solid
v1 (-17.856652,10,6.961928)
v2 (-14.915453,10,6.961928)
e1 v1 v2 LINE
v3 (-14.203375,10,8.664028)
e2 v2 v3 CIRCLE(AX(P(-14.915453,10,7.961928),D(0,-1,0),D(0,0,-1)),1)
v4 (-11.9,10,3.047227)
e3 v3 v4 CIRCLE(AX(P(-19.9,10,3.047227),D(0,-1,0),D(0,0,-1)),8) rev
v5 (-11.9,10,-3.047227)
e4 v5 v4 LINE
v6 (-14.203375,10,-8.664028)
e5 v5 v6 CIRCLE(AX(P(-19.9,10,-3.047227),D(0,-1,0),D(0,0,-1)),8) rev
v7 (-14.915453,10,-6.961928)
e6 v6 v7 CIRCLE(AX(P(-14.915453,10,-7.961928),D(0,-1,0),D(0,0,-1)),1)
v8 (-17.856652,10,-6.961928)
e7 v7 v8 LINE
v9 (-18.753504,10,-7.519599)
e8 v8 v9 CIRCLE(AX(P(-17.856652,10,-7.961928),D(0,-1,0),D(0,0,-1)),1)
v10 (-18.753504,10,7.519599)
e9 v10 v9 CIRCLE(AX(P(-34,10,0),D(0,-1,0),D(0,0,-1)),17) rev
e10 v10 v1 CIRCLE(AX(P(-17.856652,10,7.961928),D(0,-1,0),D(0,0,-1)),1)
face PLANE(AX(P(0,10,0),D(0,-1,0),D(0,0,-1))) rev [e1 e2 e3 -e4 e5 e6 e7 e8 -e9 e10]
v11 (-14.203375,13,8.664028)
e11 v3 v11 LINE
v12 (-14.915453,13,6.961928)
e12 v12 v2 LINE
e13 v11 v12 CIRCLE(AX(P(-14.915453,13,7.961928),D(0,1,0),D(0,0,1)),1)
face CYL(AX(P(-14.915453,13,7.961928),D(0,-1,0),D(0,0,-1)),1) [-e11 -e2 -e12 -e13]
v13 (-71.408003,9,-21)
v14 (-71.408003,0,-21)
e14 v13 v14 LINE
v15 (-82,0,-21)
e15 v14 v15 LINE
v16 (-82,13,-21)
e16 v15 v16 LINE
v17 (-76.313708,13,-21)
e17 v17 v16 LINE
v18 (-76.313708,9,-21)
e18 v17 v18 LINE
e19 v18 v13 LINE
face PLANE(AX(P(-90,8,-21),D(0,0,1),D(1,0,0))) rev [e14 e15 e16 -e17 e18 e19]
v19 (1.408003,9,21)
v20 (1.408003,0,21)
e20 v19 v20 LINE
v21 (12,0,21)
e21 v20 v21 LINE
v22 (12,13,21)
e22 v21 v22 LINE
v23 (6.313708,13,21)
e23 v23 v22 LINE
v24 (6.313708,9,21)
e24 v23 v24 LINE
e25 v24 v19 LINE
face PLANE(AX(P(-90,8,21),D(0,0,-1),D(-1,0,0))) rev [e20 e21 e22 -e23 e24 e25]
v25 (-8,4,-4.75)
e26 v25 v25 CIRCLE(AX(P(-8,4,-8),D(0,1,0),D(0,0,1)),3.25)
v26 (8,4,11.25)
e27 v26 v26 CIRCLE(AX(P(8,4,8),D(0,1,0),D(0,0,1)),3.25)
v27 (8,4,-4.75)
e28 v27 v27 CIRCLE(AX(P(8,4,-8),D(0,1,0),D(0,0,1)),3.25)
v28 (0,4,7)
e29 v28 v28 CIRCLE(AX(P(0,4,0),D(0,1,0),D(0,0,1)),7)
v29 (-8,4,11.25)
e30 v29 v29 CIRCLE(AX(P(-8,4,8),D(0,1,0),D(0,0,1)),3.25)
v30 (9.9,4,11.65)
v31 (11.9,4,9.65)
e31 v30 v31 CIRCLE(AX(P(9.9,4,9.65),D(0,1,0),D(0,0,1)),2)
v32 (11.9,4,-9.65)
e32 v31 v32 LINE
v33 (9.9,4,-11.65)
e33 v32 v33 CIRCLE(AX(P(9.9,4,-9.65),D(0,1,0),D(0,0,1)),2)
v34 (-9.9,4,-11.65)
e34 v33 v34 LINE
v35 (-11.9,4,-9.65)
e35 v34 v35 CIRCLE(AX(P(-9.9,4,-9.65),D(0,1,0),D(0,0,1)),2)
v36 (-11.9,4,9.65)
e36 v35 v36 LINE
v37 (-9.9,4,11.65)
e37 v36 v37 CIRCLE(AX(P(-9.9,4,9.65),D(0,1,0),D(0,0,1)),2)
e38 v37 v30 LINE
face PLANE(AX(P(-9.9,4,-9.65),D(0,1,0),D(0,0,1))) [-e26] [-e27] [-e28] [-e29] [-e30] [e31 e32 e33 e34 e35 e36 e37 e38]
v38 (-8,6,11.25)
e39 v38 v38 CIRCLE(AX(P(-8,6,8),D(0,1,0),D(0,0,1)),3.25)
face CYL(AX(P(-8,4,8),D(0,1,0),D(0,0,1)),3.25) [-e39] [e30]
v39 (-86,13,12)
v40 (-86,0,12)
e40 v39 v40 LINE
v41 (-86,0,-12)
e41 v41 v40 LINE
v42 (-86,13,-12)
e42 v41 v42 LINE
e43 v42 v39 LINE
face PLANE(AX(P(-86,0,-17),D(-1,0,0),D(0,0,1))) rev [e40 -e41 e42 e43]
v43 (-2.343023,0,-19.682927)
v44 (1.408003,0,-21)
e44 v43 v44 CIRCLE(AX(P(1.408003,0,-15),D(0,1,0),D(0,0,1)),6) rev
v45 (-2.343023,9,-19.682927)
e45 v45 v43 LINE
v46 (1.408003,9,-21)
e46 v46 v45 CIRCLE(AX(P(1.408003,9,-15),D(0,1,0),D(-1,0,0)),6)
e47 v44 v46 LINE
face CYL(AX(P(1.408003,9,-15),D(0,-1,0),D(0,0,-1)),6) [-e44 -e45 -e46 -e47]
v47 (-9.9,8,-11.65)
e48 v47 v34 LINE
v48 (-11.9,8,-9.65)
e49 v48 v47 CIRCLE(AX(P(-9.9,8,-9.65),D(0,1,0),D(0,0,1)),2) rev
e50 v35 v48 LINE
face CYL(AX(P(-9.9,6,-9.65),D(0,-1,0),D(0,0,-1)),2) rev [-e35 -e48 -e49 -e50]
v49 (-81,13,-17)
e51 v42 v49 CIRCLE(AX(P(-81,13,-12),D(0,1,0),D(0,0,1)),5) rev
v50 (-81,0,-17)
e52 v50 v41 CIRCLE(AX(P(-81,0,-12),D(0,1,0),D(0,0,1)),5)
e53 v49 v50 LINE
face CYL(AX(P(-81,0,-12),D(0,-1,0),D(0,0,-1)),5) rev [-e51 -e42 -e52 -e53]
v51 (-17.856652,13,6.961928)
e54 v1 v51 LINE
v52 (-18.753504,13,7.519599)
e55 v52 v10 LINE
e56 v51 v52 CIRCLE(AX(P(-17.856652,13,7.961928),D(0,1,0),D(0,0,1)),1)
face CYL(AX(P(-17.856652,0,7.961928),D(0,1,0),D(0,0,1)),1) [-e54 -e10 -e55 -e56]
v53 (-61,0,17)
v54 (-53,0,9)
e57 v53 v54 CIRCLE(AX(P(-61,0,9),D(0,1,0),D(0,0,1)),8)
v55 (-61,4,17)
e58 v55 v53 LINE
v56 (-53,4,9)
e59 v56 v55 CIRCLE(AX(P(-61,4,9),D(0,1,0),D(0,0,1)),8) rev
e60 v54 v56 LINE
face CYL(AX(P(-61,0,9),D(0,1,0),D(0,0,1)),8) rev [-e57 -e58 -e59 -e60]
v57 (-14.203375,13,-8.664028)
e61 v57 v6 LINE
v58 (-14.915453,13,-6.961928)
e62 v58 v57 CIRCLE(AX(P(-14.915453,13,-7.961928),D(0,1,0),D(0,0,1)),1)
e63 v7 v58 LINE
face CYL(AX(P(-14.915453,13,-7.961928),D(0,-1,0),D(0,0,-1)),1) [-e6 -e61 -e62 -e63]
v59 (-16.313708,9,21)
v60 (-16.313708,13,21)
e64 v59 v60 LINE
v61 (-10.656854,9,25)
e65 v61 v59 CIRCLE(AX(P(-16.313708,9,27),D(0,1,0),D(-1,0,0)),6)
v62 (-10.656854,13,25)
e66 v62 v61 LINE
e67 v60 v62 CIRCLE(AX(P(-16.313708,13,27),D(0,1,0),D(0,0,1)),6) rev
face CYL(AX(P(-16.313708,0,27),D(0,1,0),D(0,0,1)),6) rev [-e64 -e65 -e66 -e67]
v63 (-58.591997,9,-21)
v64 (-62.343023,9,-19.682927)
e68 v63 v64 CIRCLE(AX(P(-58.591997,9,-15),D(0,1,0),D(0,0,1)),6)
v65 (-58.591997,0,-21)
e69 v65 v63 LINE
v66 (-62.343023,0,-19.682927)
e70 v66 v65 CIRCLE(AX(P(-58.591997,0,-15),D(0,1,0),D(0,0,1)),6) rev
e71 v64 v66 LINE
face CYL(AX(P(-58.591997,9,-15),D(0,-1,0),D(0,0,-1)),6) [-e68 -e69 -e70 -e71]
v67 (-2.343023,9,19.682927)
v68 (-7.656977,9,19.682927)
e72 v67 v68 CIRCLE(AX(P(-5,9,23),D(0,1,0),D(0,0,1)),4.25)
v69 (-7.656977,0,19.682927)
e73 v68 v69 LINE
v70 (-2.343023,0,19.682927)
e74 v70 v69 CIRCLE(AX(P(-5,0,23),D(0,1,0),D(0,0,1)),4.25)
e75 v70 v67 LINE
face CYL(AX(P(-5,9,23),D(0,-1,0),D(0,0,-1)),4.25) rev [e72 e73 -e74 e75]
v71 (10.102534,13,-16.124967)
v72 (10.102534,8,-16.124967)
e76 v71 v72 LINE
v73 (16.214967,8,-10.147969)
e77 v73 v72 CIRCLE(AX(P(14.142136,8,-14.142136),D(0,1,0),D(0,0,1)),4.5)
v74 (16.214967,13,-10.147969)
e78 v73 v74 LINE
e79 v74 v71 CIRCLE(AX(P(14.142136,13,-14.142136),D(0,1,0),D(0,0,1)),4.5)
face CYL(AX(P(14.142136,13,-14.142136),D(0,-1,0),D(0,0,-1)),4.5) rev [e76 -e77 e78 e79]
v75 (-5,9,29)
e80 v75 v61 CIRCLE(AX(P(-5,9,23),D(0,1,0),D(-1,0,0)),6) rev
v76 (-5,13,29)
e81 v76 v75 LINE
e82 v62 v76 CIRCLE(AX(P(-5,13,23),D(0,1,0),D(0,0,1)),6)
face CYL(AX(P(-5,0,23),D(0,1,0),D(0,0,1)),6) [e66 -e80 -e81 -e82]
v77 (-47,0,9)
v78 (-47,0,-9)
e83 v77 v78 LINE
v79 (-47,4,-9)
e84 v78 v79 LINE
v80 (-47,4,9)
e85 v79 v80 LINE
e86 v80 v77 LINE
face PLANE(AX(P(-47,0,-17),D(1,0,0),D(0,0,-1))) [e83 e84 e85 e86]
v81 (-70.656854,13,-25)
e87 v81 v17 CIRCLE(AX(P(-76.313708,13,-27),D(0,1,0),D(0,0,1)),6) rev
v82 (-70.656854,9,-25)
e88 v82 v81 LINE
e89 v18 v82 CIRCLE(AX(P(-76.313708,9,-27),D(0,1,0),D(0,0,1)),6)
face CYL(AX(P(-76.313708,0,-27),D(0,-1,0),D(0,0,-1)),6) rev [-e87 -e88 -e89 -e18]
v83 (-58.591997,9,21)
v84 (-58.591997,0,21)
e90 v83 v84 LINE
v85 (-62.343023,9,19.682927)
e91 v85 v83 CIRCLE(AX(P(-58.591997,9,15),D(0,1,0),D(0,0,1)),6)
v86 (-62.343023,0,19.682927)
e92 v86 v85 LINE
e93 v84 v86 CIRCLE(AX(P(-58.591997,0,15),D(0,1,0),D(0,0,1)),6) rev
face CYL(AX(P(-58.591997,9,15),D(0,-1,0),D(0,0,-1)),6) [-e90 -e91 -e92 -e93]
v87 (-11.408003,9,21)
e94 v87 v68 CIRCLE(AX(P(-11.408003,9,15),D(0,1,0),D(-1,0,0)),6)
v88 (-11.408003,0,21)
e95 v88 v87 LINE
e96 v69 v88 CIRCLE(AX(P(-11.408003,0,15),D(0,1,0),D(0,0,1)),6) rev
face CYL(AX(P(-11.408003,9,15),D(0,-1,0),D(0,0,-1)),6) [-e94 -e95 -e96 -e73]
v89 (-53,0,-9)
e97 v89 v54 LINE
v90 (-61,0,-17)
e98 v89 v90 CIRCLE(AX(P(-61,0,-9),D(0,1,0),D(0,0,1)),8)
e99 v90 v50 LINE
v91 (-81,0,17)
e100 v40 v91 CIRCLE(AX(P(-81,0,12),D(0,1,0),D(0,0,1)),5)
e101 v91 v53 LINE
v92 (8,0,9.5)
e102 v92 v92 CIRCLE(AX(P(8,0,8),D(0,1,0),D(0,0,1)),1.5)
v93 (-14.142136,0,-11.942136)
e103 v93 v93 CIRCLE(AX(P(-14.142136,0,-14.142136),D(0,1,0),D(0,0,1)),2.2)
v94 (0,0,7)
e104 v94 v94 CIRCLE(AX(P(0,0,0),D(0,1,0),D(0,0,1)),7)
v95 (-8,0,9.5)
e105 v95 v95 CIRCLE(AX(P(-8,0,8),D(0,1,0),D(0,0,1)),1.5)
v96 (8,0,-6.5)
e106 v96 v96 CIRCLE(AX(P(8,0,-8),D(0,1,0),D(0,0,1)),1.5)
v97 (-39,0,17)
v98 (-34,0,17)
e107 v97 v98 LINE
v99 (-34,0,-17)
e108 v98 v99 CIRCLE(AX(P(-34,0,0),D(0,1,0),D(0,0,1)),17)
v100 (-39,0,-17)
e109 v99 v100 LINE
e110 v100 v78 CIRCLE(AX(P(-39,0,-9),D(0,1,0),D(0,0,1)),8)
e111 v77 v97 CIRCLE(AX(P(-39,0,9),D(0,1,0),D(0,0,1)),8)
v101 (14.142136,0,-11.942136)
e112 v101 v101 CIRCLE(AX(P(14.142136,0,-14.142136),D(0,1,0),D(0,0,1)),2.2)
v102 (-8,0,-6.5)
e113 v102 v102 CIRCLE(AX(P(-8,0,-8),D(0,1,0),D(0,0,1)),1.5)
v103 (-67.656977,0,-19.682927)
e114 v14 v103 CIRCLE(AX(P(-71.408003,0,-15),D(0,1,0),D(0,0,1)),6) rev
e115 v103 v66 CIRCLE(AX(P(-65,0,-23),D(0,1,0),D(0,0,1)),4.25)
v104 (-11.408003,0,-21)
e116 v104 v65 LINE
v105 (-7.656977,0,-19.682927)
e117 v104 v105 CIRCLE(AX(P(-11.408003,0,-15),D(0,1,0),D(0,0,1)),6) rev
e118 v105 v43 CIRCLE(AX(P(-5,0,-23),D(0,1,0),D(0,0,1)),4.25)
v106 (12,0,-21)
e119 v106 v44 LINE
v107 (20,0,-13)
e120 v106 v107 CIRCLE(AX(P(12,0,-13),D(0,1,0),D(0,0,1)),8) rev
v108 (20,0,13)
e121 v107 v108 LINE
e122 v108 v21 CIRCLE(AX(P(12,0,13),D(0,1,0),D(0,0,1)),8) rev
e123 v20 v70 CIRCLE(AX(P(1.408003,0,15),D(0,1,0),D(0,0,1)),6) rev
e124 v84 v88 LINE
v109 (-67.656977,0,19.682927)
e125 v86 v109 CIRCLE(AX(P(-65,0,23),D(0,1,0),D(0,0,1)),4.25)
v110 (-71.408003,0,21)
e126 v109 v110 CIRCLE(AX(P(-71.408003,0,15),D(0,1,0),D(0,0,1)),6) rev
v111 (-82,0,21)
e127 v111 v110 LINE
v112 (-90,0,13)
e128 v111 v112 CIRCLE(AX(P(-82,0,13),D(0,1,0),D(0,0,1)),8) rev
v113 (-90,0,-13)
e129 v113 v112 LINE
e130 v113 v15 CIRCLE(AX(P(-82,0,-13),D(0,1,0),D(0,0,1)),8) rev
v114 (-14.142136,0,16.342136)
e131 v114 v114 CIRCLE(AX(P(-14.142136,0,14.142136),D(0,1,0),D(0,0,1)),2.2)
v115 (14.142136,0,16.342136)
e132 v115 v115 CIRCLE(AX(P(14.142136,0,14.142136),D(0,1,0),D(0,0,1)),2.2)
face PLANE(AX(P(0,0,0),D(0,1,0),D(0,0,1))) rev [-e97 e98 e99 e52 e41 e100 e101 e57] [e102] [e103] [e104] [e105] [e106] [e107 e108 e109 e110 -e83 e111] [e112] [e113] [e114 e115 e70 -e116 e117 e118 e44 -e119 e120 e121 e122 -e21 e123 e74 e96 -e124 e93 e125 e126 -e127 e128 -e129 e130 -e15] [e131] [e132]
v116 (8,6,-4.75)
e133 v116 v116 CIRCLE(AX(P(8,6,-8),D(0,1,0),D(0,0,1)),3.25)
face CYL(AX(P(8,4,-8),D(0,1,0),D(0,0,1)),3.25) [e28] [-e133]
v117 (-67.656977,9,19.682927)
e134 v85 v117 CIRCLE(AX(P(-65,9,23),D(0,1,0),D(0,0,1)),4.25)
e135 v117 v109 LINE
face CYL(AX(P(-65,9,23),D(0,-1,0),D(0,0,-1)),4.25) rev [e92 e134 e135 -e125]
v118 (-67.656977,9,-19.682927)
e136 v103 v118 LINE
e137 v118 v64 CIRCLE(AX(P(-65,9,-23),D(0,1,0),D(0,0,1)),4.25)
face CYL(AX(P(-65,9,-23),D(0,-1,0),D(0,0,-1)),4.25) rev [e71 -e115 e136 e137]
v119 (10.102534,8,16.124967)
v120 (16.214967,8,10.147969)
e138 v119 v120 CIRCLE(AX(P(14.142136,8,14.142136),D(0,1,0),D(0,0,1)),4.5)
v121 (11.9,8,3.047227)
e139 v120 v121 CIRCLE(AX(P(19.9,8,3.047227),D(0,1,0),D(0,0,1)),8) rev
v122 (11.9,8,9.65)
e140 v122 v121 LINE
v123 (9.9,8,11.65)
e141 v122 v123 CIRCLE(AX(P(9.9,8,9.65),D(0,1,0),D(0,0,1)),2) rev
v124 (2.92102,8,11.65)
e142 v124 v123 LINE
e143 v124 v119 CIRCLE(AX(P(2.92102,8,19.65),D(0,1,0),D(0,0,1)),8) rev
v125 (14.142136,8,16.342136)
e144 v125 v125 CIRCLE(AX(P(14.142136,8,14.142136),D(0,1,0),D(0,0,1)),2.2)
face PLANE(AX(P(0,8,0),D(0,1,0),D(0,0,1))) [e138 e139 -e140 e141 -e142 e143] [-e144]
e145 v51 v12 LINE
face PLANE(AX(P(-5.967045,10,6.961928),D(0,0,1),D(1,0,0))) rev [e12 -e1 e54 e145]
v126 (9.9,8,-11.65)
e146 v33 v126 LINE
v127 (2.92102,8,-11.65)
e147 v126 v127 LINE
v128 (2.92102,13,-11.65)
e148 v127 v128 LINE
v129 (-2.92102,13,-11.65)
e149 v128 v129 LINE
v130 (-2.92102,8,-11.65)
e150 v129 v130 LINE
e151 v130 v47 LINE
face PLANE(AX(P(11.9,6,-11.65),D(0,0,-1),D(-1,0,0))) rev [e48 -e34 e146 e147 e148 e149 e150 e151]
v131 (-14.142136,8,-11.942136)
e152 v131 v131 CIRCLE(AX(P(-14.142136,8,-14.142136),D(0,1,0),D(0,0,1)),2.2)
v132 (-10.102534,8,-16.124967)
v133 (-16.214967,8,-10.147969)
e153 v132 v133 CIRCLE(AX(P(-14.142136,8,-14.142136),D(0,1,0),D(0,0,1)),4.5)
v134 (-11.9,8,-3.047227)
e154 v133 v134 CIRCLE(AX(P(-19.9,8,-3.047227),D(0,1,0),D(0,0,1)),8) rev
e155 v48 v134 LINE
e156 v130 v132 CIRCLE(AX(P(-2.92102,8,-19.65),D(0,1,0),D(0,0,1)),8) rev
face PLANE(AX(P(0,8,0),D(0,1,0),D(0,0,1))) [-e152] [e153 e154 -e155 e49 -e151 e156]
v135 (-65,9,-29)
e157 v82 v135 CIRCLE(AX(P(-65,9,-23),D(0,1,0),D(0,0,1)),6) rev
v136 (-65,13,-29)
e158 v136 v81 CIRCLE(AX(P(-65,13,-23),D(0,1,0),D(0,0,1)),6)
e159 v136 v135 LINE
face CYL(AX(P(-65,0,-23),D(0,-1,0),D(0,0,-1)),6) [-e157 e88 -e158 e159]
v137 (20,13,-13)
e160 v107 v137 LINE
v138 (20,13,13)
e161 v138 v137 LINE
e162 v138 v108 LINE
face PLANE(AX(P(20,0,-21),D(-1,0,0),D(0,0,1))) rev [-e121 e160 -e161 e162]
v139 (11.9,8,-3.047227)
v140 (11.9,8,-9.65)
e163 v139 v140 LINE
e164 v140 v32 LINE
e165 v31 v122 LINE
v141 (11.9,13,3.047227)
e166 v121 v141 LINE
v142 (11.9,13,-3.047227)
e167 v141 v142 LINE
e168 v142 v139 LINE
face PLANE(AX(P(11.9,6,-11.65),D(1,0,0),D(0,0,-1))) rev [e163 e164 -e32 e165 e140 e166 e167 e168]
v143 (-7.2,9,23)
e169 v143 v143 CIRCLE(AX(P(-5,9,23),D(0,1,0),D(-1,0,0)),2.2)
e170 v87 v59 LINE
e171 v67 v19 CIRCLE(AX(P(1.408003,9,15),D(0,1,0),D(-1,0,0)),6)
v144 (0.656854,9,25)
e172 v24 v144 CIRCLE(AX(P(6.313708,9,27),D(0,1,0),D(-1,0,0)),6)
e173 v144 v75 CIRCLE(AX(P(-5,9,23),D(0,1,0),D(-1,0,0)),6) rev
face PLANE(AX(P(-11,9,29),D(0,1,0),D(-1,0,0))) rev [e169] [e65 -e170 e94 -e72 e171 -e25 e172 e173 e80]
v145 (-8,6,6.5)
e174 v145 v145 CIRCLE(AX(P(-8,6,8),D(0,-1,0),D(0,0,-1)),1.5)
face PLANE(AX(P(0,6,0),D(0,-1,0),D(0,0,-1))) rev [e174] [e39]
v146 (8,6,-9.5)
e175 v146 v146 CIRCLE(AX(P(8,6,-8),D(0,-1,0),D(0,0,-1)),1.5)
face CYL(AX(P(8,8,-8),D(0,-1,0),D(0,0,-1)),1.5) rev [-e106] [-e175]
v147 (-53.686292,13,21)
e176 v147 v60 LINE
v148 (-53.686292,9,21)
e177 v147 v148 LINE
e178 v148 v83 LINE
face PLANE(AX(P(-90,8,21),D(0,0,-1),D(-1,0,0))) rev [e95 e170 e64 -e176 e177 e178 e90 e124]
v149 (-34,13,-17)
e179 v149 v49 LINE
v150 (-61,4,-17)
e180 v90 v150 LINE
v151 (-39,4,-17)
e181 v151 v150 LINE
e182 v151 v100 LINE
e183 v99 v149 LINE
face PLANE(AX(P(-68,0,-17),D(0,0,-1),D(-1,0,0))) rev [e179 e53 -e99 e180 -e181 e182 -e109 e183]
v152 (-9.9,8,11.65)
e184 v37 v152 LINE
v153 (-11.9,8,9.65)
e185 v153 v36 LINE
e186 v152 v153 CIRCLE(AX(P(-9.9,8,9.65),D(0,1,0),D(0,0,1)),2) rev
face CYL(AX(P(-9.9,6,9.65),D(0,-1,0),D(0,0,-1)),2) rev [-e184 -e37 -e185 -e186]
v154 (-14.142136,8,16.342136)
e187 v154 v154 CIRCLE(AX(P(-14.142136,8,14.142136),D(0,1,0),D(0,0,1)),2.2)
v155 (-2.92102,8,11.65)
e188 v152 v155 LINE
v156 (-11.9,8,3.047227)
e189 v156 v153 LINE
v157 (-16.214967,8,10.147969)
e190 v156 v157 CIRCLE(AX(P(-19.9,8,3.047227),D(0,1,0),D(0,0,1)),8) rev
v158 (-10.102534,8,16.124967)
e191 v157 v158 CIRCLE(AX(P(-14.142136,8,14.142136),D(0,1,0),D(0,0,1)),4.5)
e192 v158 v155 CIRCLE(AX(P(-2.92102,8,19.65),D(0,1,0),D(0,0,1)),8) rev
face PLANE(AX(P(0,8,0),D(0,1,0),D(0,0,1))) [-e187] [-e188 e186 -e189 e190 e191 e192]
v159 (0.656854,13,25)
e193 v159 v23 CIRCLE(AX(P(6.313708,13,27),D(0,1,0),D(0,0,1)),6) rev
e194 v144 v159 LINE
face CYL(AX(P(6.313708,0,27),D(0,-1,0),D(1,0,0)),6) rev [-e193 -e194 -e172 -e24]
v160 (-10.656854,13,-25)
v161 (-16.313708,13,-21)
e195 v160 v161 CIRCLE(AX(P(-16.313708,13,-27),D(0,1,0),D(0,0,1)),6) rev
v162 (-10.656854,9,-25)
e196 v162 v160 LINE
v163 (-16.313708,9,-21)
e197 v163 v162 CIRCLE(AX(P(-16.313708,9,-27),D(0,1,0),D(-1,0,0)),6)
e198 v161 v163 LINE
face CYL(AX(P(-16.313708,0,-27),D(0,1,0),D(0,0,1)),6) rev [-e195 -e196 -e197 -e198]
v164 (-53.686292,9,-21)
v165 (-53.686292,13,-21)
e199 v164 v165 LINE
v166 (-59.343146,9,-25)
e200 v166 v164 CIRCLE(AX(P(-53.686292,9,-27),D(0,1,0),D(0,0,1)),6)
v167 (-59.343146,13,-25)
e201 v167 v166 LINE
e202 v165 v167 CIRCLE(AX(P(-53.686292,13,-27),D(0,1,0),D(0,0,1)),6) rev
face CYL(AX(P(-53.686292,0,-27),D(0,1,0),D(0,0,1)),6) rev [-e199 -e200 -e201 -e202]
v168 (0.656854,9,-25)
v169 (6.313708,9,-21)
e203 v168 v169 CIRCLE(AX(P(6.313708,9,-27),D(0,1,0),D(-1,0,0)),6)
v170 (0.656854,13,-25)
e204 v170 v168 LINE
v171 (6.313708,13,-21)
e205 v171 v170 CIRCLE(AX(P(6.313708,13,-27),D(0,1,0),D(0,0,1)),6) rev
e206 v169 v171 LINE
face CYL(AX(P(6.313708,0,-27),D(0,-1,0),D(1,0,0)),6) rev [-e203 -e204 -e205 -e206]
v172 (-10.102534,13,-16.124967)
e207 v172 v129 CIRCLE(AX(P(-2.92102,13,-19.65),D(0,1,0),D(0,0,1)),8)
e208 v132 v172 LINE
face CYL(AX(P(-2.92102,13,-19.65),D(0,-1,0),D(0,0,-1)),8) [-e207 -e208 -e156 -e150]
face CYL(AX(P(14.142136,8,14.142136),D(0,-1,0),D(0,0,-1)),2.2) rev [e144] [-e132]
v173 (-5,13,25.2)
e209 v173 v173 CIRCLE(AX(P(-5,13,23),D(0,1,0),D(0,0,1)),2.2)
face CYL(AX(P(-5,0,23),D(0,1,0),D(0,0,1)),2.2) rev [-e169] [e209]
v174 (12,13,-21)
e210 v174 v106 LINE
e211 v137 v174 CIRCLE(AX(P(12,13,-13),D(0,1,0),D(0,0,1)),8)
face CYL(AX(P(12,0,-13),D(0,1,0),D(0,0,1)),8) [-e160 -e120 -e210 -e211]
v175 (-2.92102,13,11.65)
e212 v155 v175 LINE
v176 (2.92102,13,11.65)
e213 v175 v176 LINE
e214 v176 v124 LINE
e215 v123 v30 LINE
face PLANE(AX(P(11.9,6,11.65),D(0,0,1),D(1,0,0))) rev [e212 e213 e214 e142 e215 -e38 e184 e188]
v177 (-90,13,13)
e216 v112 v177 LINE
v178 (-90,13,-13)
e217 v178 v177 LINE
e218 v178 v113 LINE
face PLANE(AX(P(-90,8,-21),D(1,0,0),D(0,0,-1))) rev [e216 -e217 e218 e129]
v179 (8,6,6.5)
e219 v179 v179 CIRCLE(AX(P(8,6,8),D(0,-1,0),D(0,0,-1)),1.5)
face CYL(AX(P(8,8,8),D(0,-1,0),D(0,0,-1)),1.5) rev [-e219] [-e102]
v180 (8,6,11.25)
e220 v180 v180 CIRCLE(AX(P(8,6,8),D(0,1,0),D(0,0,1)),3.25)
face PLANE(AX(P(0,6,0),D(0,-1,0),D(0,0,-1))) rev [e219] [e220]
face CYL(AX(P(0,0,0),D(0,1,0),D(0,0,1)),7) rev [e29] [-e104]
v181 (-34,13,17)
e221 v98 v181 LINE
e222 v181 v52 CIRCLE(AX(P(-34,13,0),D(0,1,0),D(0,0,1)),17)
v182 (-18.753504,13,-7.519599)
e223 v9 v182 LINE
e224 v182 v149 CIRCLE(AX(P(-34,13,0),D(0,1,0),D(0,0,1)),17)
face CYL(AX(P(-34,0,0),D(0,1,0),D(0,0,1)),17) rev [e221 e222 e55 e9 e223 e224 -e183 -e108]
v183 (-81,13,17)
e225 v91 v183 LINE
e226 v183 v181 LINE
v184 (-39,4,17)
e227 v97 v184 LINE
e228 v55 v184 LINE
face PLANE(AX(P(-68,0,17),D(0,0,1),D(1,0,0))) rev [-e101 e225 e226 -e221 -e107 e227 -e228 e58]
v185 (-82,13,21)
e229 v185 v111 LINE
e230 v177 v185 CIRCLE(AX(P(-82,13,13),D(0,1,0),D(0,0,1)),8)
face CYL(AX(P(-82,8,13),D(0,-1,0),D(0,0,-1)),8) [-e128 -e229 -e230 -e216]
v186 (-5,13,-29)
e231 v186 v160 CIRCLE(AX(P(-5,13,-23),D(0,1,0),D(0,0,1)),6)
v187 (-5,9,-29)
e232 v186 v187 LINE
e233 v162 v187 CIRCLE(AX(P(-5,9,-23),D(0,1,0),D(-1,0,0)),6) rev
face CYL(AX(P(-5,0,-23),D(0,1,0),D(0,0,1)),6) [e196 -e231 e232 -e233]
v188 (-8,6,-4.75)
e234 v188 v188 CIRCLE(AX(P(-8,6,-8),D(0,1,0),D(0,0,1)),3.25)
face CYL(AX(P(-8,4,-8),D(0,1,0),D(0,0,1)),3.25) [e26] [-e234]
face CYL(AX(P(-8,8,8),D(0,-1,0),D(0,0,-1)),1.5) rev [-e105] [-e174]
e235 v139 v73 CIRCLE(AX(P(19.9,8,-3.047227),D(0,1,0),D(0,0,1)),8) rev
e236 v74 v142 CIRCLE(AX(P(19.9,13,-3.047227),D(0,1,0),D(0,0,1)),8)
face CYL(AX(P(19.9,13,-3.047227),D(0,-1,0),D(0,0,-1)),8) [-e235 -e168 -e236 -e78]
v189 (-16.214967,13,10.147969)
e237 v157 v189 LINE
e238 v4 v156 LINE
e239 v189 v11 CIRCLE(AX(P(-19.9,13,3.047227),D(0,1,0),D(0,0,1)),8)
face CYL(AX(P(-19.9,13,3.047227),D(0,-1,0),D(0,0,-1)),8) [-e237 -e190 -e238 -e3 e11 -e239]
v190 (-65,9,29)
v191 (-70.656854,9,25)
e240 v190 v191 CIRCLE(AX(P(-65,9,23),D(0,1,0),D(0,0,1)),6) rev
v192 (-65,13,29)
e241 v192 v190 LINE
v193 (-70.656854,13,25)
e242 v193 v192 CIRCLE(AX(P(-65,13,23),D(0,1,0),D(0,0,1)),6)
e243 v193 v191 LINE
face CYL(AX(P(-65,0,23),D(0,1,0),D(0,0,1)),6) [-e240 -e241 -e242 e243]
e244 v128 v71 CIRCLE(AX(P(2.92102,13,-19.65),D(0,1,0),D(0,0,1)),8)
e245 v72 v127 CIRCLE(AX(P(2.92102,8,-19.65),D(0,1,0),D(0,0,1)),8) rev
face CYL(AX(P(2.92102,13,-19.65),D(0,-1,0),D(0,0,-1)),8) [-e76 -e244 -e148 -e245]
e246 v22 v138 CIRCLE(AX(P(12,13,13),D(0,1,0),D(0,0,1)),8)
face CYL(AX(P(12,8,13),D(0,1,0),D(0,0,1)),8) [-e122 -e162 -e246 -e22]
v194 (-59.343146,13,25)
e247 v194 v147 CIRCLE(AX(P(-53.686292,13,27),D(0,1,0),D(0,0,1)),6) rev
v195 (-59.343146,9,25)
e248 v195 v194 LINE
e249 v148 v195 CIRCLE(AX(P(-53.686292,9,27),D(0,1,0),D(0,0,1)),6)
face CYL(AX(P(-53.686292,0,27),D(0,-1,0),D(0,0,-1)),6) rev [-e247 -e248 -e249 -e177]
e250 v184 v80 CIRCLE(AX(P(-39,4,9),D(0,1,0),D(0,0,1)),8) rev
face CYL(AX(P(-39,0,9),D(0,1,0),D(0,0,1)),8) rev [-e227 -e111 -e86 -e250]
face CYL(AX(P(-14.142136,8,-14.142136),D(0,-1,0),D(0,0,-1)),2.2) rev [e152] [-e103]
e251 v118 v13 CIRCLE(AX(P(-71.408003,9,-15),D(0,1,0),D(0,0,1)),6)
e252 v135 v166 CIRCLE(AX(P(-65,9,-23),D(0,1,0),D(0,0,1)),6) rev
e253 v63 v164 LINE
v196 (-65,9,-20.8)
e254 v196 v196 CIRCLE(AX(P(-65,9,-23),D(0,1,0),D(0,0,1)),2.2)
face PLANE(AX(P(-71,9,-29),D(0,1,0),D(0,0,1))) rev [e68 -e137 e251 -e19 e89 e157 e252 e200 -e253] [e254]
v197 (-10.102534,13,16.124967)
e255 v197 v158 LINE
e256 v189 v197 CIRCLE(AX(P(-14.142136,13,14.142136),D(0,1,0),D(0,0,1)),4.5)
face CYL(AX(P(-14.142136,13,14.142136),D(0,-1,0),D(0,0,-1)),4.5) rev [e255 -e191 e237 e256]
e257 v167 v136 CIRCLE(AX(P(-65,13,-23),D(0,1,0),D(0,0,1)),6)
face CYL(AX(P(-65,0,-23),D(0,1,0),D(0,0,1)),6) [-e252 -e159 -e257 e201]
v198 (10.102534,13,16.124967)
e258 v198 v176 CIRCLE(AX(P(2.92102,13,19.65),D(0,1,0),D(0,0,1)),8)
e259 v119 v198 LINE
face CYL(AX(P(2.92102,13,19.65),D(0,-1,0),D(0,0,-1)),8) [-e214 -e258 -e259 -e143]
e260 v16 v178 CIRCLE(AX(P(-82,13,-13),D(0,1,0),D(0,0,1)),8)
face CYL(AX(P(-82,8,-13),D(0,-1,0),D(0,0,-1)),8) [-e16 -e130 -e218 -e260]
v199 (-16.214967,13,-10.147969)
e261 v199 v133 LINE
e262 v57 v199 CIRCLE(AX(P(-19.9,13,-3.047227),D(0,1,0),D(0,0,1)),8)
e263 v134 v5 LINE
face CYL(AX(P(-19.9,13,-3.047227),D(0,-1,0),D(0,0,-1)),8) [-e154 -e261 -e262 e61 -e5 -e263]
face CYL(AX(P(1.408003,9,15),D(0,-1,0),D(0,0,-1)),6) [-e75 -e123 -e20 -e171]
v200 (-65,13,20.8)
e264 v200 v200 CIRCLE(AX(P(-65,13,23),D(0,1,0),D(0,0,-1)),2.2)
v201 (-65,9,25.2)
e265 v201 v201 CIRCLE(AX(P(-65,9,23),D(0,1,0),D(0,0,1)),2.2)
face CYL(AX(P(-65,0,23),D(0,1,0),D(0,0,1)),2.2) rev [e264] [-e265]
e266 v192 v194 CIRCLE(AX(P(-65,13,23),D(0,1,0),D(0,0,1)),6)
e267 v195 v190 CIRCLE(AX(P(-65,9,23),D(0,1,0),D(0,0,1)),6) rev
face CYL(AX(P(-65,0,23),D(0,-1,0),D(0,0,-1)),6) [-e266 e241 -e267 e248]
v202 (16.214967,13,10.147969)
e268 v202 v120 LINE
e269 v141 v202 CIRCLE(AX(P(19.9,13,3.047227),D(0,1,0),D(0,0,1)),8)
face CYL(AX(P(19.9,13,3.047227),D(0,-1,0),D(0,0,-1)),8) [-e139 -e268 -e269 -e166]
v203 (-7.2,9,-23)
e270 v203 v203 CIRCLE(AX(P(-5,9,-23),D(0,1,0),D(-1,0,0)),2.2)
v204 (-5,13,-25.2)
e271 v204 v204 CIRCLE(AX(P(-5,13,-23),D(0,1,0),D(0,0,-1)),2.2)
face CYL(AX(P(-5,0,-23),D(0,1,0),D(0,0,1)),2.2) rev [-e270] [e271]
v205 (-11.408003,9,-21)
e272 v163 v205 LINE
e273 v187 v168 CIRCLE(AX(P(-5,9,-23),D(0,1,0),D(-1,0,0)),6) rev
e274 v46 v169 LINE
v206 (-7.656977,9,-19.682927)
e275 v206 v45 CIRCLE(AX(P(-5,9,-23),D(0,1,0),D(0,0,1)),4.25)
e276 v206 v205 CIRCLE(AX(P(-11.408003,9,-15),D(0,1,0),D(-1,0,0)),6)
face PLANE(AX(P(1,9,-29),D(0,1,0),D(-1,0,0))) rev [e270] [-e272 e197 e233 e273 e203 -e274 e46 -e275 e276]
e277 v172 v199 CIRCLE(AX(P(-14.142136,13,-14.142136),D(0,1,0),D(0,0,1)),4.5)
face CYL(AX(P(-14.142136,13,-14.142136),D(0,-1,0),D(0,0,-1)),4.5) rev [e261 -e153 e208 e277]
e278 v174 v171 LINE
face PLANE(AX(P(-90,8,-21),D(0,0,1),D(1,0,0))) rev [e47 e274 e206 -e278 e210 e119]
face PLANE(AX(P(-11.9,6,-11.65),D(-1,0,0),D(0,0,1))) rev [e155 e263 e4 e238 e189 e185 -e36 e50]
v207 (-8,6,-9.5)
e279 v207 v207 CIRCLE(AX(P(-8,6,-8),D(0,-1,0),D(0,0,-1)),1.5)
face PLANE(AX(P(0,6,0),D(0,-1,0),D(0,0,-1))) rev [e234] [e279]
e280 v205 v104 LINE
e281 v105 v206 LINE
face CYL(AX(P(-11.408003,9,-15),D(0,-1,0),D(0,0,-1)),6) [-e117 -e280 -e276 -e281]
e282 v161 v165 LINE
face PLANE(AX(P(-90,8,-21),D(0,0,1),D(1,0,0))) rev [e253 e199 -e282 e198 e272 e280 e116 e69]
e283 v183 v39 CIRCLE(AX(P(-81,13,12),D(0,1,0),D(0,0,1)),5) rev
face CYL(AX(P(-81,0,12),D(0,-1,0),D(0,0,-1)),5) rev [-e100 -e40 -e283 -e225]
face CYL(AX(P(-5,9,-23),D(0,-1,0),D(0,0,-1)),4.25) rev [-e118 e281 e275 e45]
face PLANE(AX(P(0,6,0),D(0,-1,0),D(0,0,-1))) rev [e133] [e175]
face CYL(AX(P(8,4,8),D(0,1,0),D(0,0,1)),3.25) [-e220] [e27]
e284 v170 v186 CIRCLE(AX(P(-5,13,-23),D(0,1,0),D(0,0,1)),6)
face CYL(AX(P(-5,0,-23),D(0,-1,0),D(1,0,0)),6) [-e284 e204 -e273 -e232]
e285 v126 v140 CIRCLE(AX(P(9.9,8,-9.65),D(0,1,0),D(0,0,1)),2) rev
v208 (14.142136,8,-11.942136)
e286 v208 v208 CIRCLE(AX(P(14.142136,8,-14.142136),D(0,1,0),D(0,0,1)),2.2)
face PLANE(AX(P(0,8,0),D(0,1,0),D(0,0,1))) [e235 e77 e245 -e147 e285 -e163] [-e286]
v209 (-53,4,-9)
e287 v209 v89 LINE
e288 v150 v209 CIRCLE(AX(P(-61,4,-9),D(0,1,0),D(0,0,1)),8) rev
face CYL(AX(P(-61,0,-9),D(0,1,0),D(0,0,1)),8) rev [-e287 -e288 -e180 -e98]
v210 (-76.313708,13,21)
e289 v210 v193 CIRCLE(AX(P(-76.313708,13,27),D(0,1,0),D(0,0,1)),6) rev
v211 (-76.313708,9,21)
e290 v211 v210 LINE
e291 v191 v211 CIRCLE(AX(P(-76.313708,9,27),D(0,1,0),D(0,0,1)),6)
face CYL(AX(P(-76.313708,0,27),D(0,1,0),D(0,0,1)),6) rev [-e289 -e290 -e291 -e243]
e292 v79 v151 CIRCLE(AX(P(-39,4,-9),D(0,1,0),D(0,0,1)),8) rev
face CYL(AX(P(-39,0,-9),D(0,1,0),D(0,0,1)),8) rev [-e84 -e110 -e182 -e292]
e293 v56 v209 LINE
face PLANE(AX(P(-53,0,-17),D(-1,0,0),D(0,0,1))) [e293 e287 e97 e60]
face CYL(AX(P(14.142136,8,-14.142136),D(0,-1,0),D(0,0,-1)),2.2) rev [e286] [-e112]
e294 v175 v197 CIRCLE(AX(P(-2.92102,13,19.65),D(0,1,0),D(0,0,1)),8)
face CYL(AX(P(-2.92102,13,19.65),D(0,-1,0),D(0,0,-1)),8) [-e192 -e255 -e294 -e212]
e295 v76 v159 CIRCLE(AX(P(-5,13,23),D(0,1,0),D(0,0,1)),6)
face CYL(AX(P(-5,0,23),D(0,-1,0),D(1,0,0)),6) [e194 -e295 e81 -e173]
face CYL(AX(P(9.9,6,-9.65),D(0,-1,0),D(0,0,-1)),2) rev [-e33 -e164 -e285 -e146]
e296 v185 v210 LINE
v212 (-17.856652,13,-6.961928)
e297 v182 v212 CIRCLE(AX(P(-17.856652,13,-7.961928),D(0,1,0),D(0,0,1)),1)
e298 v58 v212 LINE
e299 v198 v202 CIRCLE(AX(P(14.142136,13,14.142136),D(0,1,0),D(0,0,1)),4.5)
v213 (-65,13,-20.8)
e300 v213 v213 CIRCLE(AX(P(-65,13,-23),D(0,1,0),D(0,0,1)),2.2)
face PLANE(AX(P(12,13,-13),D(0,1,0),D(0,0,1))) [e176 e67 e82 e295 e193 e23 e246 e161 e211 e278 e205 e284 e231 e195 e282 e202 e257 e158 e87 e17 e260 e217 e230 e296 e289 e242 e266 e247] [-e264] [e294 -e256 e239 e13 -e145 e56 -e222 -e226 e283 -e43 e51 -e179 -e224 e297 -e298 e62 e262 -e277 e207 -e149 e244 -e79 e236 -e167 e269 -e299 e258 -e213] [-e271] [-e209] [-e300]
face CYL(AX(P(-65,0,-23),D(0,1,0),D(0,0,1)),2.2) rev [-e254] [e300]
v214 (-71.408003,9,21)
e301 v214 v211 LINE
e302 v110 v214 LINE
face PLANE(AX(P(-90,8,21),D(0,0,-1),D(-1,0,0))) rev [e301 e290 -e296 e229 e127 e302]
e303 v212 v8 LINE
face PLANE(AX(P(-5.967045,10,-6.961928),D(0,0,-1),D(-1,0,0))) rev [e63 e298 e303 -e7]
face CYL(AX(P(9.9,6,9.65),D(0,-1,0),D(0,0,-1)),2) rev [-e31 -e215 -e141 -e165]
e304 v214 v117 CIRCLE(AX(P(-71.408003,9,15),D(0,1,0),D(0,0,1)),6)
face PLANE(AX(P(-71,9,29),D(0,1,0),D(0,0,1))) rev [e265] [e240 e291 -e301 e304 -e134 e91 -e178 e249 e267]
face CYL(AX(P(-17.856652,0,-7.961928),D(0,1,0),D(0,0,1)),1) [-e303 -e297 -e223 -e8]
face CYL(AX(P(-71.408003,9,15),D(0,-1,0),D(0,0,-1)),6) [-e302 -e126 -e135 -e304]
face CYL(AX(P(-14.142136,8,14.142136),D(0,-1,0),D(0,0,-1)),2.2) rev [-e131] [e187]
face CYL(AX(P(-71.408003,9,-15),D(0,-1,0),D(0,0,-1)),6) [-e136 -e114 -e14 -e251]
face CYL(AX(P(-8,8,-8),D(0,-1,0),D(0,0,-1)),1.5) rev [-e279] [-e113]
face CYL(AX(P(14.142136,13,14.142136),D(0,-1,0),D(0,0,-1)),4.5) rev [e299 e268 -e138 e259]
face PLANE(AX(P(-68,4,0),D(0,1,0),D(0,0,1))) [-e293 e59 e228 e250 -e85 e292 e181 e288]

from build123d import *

# Parameters (mm, degrees)
ESQUISSE1_W              = 120
ESQUISSE1_H              = 42
ESQUISSE1_R              = 2.2
ESQUISSE1_R_2            = 1.5
BOSS_EXTRU_1_DEPTH       = 8
ESQUISSE2_W              = 23.8
ESQUISSE2_H              = 23.3
ENL_V_MAT_EXTRU_1_DEPTH  = 2
CONG_1_R                 = 2
ENL_V_START              = -2
ESQUISSE4_R              = 3.25
ENL_V_MAT_EXTRU_2_DEPTH  = 2
ESQUISSE5_R              = 7
ENL_V_MAT_EXTRU_3_DEPTH  = 93.504053965
ENL_V_MAT_EXTRU_4_DEPTH  = 93.763139231
ESQUISSE8_W              = 6
ESQUISSE8_H              = 34
BOSS_EXTRU_2_DEPTH       = 8
CONG_2_R                 = 8
ESQUISSE9_W              = 10
ESQUISSE9_H              = 42
ENL_V_MAT_EXTRU_5_DEPTH  = 93.763139231
CONG_3_R                 = 8
BOSS_EXTRU_3_DEPTH       = 5
CONG_4_R                 = 8
ENL_V_START_2            = -9
ENL_V_MAT_EXTRU_6_DEPTH  = 9
ESQUISSE13_W             = 23.395732087
ESQUISSE13_H             = 34
ENL_V_MAT_EXTRU_7_DEPTH  = 94.327380763
CONG_5_R                 = 5
ESQUISSE14_W             = 12
ESQUISSE14_H             = 4
BOSS_EXTRU_4_DEPTH       = 8
ESQUISSE15_W             = 12
ESQUISSE15_H             = 4
BOSS_EXTRU_5_DEPTH       = 8
CONG_6_R                 = 6
ESQUISSE16_R             = 2.2
ENL_V_MAT_EXTRU_8_DEPTH  = 96.446319992
ESQUISSE17_R             = 4.25
ENL_V_MAT_EXTRU_9_DEPTH  = 9
CONG_7_R                 = 6
CONG_8_R                 = 6
ESQUISSE19_W             = 17.468807988
ESQUISSE19_H             = 13.923856562
ENL_V_MAT_EXTRU_10_DEPTH = 3
CONG_9_R                 = 1


# Some blends are built 0.0001 mm under size
with BuildPart() as part:
    # Esquisse1 → Boss.-Extru.1 (new body)
    with BuildSketch(Plane(origin=(0, 0, 0), x_dir=(1, 0, 0), z_dir=(0, 1, 0))):
        with Locations((-30, 0)):
            Rectangle(ESQUISSE1_W, ESQUISSE1_H)
        with Locations(Location((14.142135624, 14.142135624, 0), (0, 0, 270))):
            Circle(ESQUISSE1_R, mode=Mode.SUBTRACT)
        with Locations(Location((14.142135624, -14.142135624, 0), (0, 0, 270))):
            Circle(ESQUISSE1_R, mode=Mode.SUBTRACT)
        with Locations(Location((-14.142135624, -14.142135624, 0), (0, 0, 270))):
            Circle(ESQUISSE1_R, mode=Mode.SUBTRACT)
        with Locations(Location((-14.142135624, 14.142135624, 0), (0, 0, 270))):
            Circle(ESQUISSE1_R, mode=Mode.SUBTRACT)
        with Locations(Location((-8, 8, 0), (0, 0, 270))):
            Circle(ESQUISSE1_R_2, mode=Mode.SUBTRACT)
        with Locations(Location((-8, -8, 0), (0, 0, 270))):
            Circle(ESQUISSE1_R_2, mode=Mode.SUBTRACT)
        with Locations(Location((8, -8, 0), (0, 0, 270))):
            Circle(ESQUISSE1_R_2, mode=Mode.SUBTRACT)
        with Locations(Location((8, 8, 0), (0, 0, 270))):
            Circle(ESQUISSE1_R_2, mode=Mode.SUBTRACT)
    extrude(amount=BOSS_EXTRU_1_DEPTH)

    # Esquisse2 → Enlèv. mat.-Extru.1 (cut)
    with BuildSketch(Plane(origin=(0, 8, 0), x_dir=(1, 0, 0), z_dir=(0, 1, 0))):
        Rectangle(ESQUISSE2_W, ESQUISSE2_H)
    extrude(amount=-ENL_V_MAT_EXTRU_1_DEPTH, mode=Mode.SUBTRACT)

    # Congé1
    cong_1_edges = [part.edges().sort_by_distance(p)[0] for p in [
        (-11.9, 7, 11.65),
        (-11.9, 7, -11.65),
        (11.9, 7, -11.65),
        (11.9, 7, 11.65),
    ]]
    fillet(cong_1_edges, radius=CONG_1_R)

    # Esquisse4 → Enlèv. mat.-Extru.2 (cut)
    with BuildSketch(Plane(origin=(0, 6, 0), x_dir=(1, 0, 0), z_dir=(0, 1, 0)).offset(ENL_V_START)):
        with BuildLine():
            Line((-11.9, 9.65), (-11.9, -9.65))
            ThreePointArc((-11.9, -9.65), (-11.314213562, -11.064213562), (-9.9, -11.65))
            Line((-9.9, -11.65), (9.9, -11.65))
            ThreePointArc((9.9, -11.65), (11.314213562, -11.064213562), (11.9, -9.65))
            Line((11.9, -9.65), (11.9, 9.65))
            ThreePointArc((11.9, 9.65), (11.314213562, 11.064213562), (9.9, 11.65))
            Line((9.9, 11.65), (-9.9, 11.65))
            ThreePointArc((-9.9, 11.65), (-11.314213562, 11.064213562), (-11.9, 9.65))
        make_face()
        with Locations(Location((8, 8, 0), (0, 0, 270))):
            Circle(ESQUISSE4_R, mode=Mode.SUBTRACT)
        with Locations(Location((-8, 8, 0), (0, 0, 270))):
            Circle(ESQUISSE4_R, mode=Mode.SUBTRACT)
        with Locations(Location((-8, -8, 0), (0, 0, 270))):
            Circle(ESQUISSE4_R, mode=Mode.SUBTRACT)
        with Locations(Location((8, -8, 0), (0, 0, 270))):
            Circle(ESQUISSE4_R, mode=Mode.SUBTRACT)
    extrude(amount=ENL_V_MAT_EXTRU_2_DEPTH, mode=Mode.SUBTRACT)

    # Esquisse5 → Enlèv. mat.-Extru.3 (cut, through all)
    with BuildSketch(Plane(origin=(0, 4, 0), x_dir=(1, 0, 0), z_dir=(0, 1, 0))):
        with Locations(Location((0, 0, 0), (0, 0, 270))):
            Circle(ESQUISSE5_R)
    extrude(amount=-ENL_V_MAT_EXTRU_3_DEPTH, mode=Mode.SUBTRACT)

    # Esquisse6 → Enlèv. mat.-Extru.4 (cut, through all)
    with BuildSketch(Plane(origin=(0, 8, 0), x_dir=(1, 0, 0), z_dir=(0, 1, 0))):
        with BuildLine():
            Line((-68, 17), (-34, 17))
            ThreePointArc((-34, 17), (-17, 0), (-34, -17))
            Line((-34, -17), (-68, -17))
            ThreePointArc((-68, -17), (-85, 0), (-68, 17))
        make_face()
    extrude(amount=-ENL_V_MAT_EXTRU_4_DEPTH, mode=Mode.SUBTRACT)

    # Esquisse8 → Boss.-Extru.2 (add)
    with BuildSketch(Plane(origin=(0, 8, 0), x_dir=(1, 0, 0), z_dir=(0, 1, 0))):
        with Locations((-50, 0)):
            Rectangle(ESQUISSE8_W, ESQUISSE8_H)
    extrude(amount=-BOSS_EXTRU_2_DEPTH)

    # Congé2
    cong_2_edges = [part.edges().sort_by_distance(p)[0] for p in [
        (-53, 4, 17),
        (-53, 4, -17),
        (-47, 4, -17),
        (-47, 4, 17),
    ]]
    fillet(cong_2_edges, radius=CONG_2_R)

    # Esquisse9 → Enlèv. mat.-Extru.5 (cut, through all)
    with BuildSketch(Plane(origin=(0, 8, 0), x_dir=(1, 0, 0), z_dir=(0, 1, 0))):
        with Locations((25, 0)):
            Rectangle(ESQUISSE9_W, ESQUISSE9_H)
    extrude(amount=-ENL_V_MAT_EXTRU_5_DEPTH, mode=Mode.SUBTRACT)

    # Congé3
    cong_3_edges = [part.edges().sort_by_distance(p)[0] for p in [
        (20, 4, 21),
        (20, 4, -21),
        (-90, 4, -21),
        (-90, 4, 21),
    ]]
    fillet(cong_3_edges, radius=CONG_3_R)

    # Esquisse10 → Boss.-Extru.3 (add)
    with BuildSketch(Plane(origin=(0, 8, 0), x_dir=(1, 0, 0), z_dir=(0, 1, 0))):
        with BuildLine():
            Line((12, 21), (-82, 21))
            ThreePointArc((-82, 21), (-87.656854249, 18.656854249), (-90, 13))
            Line((-90, 13), (-90, -13))
            ThreePointArc((-90, -13), (-87.656854249, -18.656854249), (-82, -21))
            Line((-82, -21), (12, -21))
            ThreePointArc((12, -21), (17.656854249, -18.656854249), (20, -13))
            Line((20, -13), (20, 13))
            ThreePointArc((20, 13), (17.656854249, 18.656854249), (12, 21))
        make_face()
        with BuildLine():
            Line((-39, -17), (-34, -17))
            ThreePointArc((-34, -17), (-17, 0), (-34, 17))
            Line((-34, 17), (-39, 17))
            ThreePointArc((-39, 17), (-44.656854249, 14.656854249), (-47, 9))
            Line((-47, 9), (-47, -9))
            ThreePointArc((-47, -9), (-44.656854249, -14.656854249), (-39, -17))
        make_face(mode=Mode.SUBTRACT)
        with BuildLine():
            Line((-61, 17), (-68, 17))
            ThreePointArc((-68, 17), (-85, 0), (-68, -17))
            Line((-68, -17), (-61, -17))
            ThreePointArc((-61, -17), (-55.343145751, -14.656854249), (-53, -9))
            Line((-53, -9), (-53, 9))
            ThreePointArc((-53, 9), (-55.343145751, 14.656854249), (-61, 17))
        make_face(mode=Mode.SUBTRACT)
        with BuildLine():
            Line((-11.9, 9.65), (-11.9, -9.65))
            ThreePointArc((-11.9, -9.65), (-11.872122849, -9.982763383), (-11.789268531, -10.30625027))
            ThreePointArc((-11.789268531, -10.30625027), (-17.231773328, -17.413853652), (-10.447111779, -11.573712219))
            ThreePointArc((-10.447111779, -11.573712219), (-10.176202428, -11.630836242), (-9.9, -11.65))
            Line((-9.9, -11.65), (9.9, -11.65))
            ThreePointArc((9.9, -11.65), (10.176202428, -11.630836242), (10.447111779, -11.573712219))
            ThreePointArc((10.447111779, -11.573712219), (17.231773328, -17.413853652), (11.789268531, -10.30625027))
            ThreePointArc((11.789268531, -10.30625027), (11.872122849, -9.982763383), (11.9, -9.65))
            Line((11.9, -9.65), (11.9, 9.65))
            ThreePointArc((11.9, 9.65), (11.872122849, 9.982763383), (11.789268531, 10.30625027))
            ThreePointArc((11.789268531, 10.30625027), (17.231773328, 17.413853652), (10.447111779, 11.573712219))
            ThreePointArc((10.447111779, 11.573712219), (10.176202428, 11.630836242), (9.9, 11.65))
            Line((9.9, 11.65), (-9.9, 11.65))
            ThreePointArc((-9.9, 11.65), (-10.176202428, 11.630836242), (-10.447111779, 11.573712219))
            ThreePointArc((-10.447111779, 11.573712219), (-17.231773328, 17.413853652), (-11.789268531, 10.30625027))
            ThreePointArc((-11.789268531, 10.30625027), (-11.872122849, 9.982763383), (-11.9, 9.65))
        make_face(mode=Mode.SUBTRACT)
    extrude(amount=BOSS_EXTRU_3_DEPTH)

    # Congé4
    # the kernel refuses this fillet: 8 mm, written as the material it takes off along each edge
    with BuildSketch(Plane(origin=(-11.789268531, 8, 10.30625027), x_dir=(-0.9993610722438664, 0, -0.035741394538964716), z_dir=(0, 1, 0))) as cong_4_piece_1:
        with BuildLine():
            CenterArc((8.364996913, -6.964496446), CONG_4_R, 119.475980174, 62.572287137)
            Line((0.370108335, -7.250427602), (-0.429380523, -7.279020718))
            ThreePointArc((-0.429380523, -7.279020718), (-0.665372839, -0.680466392), (-0.74584245, -0.289342426))
            Line((-0.74584245, -0.289342426), (0.393646914, 0.696449645))
            ThreePointArc((0.393646914, 0.696449645), (2.214263889, 0.217529251), (4.034880864, 0.696449645))
            Line((4.034880864, 0.696449645), (4.428527777, 0))
        make_face()
    extrude(amount=23.149669521, mode=Mode.SUBTRACT)
    with BuildSketch(Plane(origin=(-10.447111779, 8, 11.573712219), x_dir=(0.07549442305242757, 0, 0.9971462240253337), z_dir=(0, 1, 0))) as cong_4_piece_2:
        with BuildLine():
            CenterArc((8.621417802, 6.894899054), CONG_4_R, 175.670368799, 63.855969723)
            Line((0.64424801, 7.498854438), (-0.153468969, 7.559249976))
            ThreePointArc((-0.153468969, 7.559249976), (-0.680343018, 0.600186681), (-0.750767395, 0.276311995))
            Line((-0.750767395, 0.276311995), (0.405713779, -0.689489905))
            ThreePointArc((0.405713779, -0.689489905), (2.282140006, -0.178380718), (4.158566234, -0.689489905))
            Line((4.158566234, -0.689489905), (4.564280013, 0))
        make_face()
    extrude(amount=23.816195381, mode=Mode.SUBTRACT)
    with BuildSketch(Plane(origin=(10.447111779, 8, 11.573712219), x_dir=(-0.07549442305230755, 0, 0.9971462240253428), z_dir=(0, 1, 0)), Plane(origin=(-10.447111779, 8, -11.573712219), x_dir=(0.07549442305210272, 0, -0.9971462240253584), z_dir=(0, 1, 0))) as cong_4_piece_3:
        with BuildLine():
            CenterArc((8.621417802, -6.894899054), CONG_4_R, 120.473661478, 63.855969723)
            Line((0.64424801, -7.498854438), (-0.153468969, -7.559249976))
            ThreePointArc((-0.153468969, -7.559249976), (-0.680343018, -0.600186681), (-0.750767395, -0.276311995))
            Line((-0.750767395, -0.276311995), (0.405713779, 0.689489905))
            ThreePointArc((0.405713779, 0.689489905), (2.282140006, 0.178380718), (4.158566234, 0.689489905))
            Line((4.158566234, 0.689489905), (4.564280013, 0))
        make_face()
    extrude(amount=23.816195381, mode=Mode.SUBTRACT)
    with BuildSketch(Plane(origin=(11.789268531, 8, 10.30625027), x_dir=(0.9993610722438551, 0, -0.03574139453927694), z_dir=(0, 1, 0)), Plane(origin=(-11.789268531, 8, -10.30625027), x_dir=(-0.9993610722438627, 0, 0.03574139453906518), z_dir=(0, 1, 0))) as cong_4_piece_4:
        with BuildLine():
            CenterArc((8.364996913, 6.964496446), CONG_4_R, 177.951732689, 62.572287137)
            Line((0.370108335, 7.250427602), (-0.429380523, 7.279020718))
            ThreePointArc((-0.429380523, 7.279020718), (-0.665372839, 0.680466392), (-0.74584245, 0.289342426))
            Line((-0.74584245, 0.289342426), (0.393646914, -0.696449645))
            ThreePointArc((0.393646914, -0.696449645), (2.214263889, -0.217529251), (4.034880864, -0.696449645))
            Line((4.034880864, -0.696449645), (4.428527777, 0))
        make_face()
    extrude(amount=23.149669521, mode=Mode.SUBTRACT)
    with BuildSketch(Plane(origin=(11.789268531, 8, -10.30625027), x_dir=(0.01525254616124988, 0, 0.9998836731518317), z_dir=(0, 1, 0))) as cong_4_piece_5:
        with BuildLine():
            CenterArc((7.381888178, 7.999069385), CONG_4_R, 206.553772453, 62.572287137)
            Line((0.225766513, 4.422769241), (-0.489845653, 4.065139226))
            ThreePointArc((-0.489845653, 4.065139226), (-0.104363135, 2.22247427), (-0.675475897, 0.428640073))
            Line((-0.675475897, 0.428640073), (0.25094311, -0.759623298))
            ThreePointArc((0.25094311, -0.759623298), (0.645660831, -0.699197838), (7.247665771, -0.799906939))
            Line((7.247665771, -0.799906939), (7.259867808, 0))
        make_face()
    extrude(amount=23.149669521, mode=Mode.SUBTRACT)
    with BuildSketch(Plane(origin=(10.447111779, 8, -11.573712219), x_dir=(-0.9999486302426401, 0, -0.01013592007997942), z_dir=(0, 1, 0))) as cong_4_piece_6:
        with BuildLine():
            CenterArc((7.607565513, -7.999589042), CONG_4_R, 90.580755387, 63.855969723)
            Line((0.390691138, -4.547528171), (-0.330996299, -4.202322084))
            ThreePointArc((-0.330996299, -4.202322084), (0.017619545, -2.289033036), (-0.652231235, -0.463243366))
            Line((-0.652231235, -0.463243366), (0.211034032, 0.771663552))
            ThreePointArc((0.211034032, 0.771663552), (0.539748185, 0.729220523), (7.518369416, 0.799958904))
            Line((7.518369416, 0.799958904), (7.526478153, 0))
        make_face()
    extrude(amount=23.816195381, mode=Mode.SUBTRACT)

    # Esquisse11 → Enlèv. mat.-Extru.6 (cut)
    with BuildSketch(Plane(origin=(0, 13, 0), x_dir=(1, 0, 0), z_dir=(0, 1, 0)).offset(ENL_V_START_2)):
        with BuildLine():
            Line((-68, 17), (-34, 17))
            ThreePointArc((-34, 17), (-17, 0), (-34, -17))
            Line((-34, -17), (-68, -17))
            ThreePointArc((-68, -17), (-85, 0), (-68, 17))
        make_face()
    extrude(amount=ENL_V_MAT_EXTRU_6_DEPTH, mode=Mode.SUBTRACT)

    # Esquisse13 → Enlèv. mat.-Extru.7 (cut, through all)
    with BuildSketch(Plane(origin=(0, 13, 0), x_dir=(1, 0, 0), z_dir=(0, 1, 0))):
        with Locations((-74.302133957, 0)):
            Rectangle(ESQUISSE13_W, ESQUISSE13_H)
    extrude(amount=-ENL_V_MAT_EXTRU_7_DEPTH, mode=Mode.SUBTRACT)

    # Congé5
    cong_5_edges = [part.edges().sort_by_distance(p)[0] for p in [
        (-86, 6.5, -17),
        (-86, 6.5, 17),
    ]]
    fillet(cong_5_edges, radius=CONG_5_R)

    # Esquisse14 → Boss.-Extru.4 (add)
    with BuildSketch(Plane(origin=(0, 0, -21), x_dir=(-1, 0, 0), z_dir=(0, 0, -1))):
        with Locations((65, 11)):
            Rectangle(ESQUISSE14_W, ESQUISSE14_H)
        with Locations((5, 11)):
            Rectangle(ESQUISSE14_W, ESQUISSE14_H)
    extrude(amount=BOSS_EXTRU_4_DEPTH)

    # Esquisse15 → Boss.-Extru.5 (add)
    with BuildSketch(Plane.XY.offset(21)):
        with Locations((-5, 11)):
            Rectangle(ESQUISSE15_W, ESQUISSE15_H)
        with Locations((-65, 11)):
            Rectangle(ESQUISSE15_W, ESQUISSE15_H)
    extrude(amount=BOSS_EXTRU_5_DEPTH)

    # Congé6
    cong_6_edges = [part.edges().sort_by_distance(p)[0] for p in [
        (-71, 11, -29),
        (-59, 11, -29),
        (-11, 11, -29),
        (1, 11, -29),
        (1, 11, 29),
        (-11, 11, 29),
        (-59, 11, 29),
        (-71, 11, 29),
    ]]
    fillet(cong_6_edges, radius=CONG_6_R - 0.0001)  # a hair under: the kernel refuses the full size

    # Esquisse16 → Enlèv. mat.-Extru.8 (cut, through all)
    with BuildSketch(Plane(origin=(0, 13, 0), x_dir=(1, 0, 0), z_dir=(0, 1, 0))):
        with Locations(Location((-65, 23, 0), (0, 0, 270))):
            Circle(ESQUISSE16_R)
        with Locations(Location((-5, -23, 0), (0, 0, 270))):
            Circle(ESQUISSE16_R)
        with Locations(Location((-5, 23, 0), (0, 0, 245.380022671))):
            Circle(ESQUISSE16_R)
        with Locations(Location((-65, -23, 0), (0, 0, 114.619977329))):
            Circle(ESQUISSE16_R)
    extrude(amount=-ENL_V_MAT_EXTRU_8_DEPTH, mode=Mode.SUBTRACT)

    # Esquisse17 → Enlèv. mat.-Extru.9 (cut)
    with BuildSketch(Plane(origin=(0, 0, 0), x_dir=(1, 0, 0), z_dir=(0, 1, 0))):
        with Locations((-65, 23)):
            Circle(ESQUISSE17_R)
        with Locations((-5, 23)):
            Circle(ESQUISSE17_R)
        with Locations((-65, -23)):
            Circle(ESQUISSE17_R)
        with Locations((-5, -23)):
            Circle(ESQUISSE17_R)
    extrude(amount=ENL_V_MAT_EXTRU_9_DEPTH, mode=Mode.SUBTRACT)

    # Congé7
    cong_7_edges = [part.edges().sort_by_distance(p)[0] for p in [
        (-68.75, 4.5, 21),
        (-61.25, 4.5, 21),
        (-8.75, 4.5, 21),
        (-1.25, 4.5, 21),
        (-8.75, 4.5, -21),
        (-1.25, 4.5, -21),
        (-61.25, 4.5, -21),
        (-68.75, 4.5, -21),
    ]]
    fillet(cong_7_edges, radius=CONG_7_R)

    # Congé8
    # the kernel refuses this fillet: 6 mm, written as the material it adds along each edge
    with BuildSketch(Plane(origin=(-11, 9, 20.986111735), x_dir=(0.08517389906412692, 0, 0.996366100847582), z_dir=(0, 1, 0)), Plane(origin=(1, 9, -20.986111735), x_dir=(-0.08517389906412681, 0, -0.996366100847582), z_dir=(0, 1, 0))) as cong_8_piece_1:
        with BuildLine():
            CenterArc((5.539442635, -5.806654513), CONG_8_R, 104.584858197, 70.529116987)
            Line((-0.43875397, -5.295611118), (-1.03657363, -5.244506779))
            ThreePointArc((-1.03657363, -5.244506779), (-0.618733054, -0.356598746), (-0.599911, 0.010334031))
            Line((-0.599911, 0.010334031), (0.051104339, 0.597819661))
            ThreePointArc((0.051104339, 0.597819661), (2.057773974, 0.426280427), (3.877472817, 0.580665451))
            Line((3.877472817, 0.580665451), (4.028560983, 0))
        make_face()
    extrude(amount=4)
    with BuildSketch(Plane(origin=(1, 9, 20.986111735), x_dir=(0.9999965844275012, 0, 0.0026136436887378585), z_dir=(0, 1, 0)), Plane(origin=(-59, 9, 20.986111735), x_dir=(0.9999965844275012, 0, 0.0026136436887378585), z_dir=(0, 1, 0))) as cong_8_piece_2:
        with BuildLine():
            CenterArc((5.3294378, -5.999979507), CONG_8_R, 90.149750923, 70.529116987)
            Line((-0.332636114, -4.014804703), (-0.898843505, -3.816287223))
            ThreePointArc((-0.898843505, -3.816287223), (-0.594734103, -2.015549572), (-0.599997951, -0.001568186))
            Line((-0.599997951, -0.001568186), (0.039235585, 0.598715766))
            ThreePointArc((0.039235585, 0.598715766), (0.406469528, 0.587176107), (5.312187751, 0.599997951))
            Line((5.312187751, 0.599997951), (5.313755938, 0))
        make_face()
    extrude(amount=4)
    with BuildSketch(Plane(origin=(-71, 9, 20.986111735), x_dir=(-0.9999965844275012, 0, 0.0026136436887378585), z_dir=(0, 1, 0)), Plane(origin=(-59, 9, -20.986111735), x_dir=(0.9999965844275012, 0, -0.0026136436887378585), z_dir=(0, 1, 0))) as cong_8_piece_3:
        with BuildLine():
            CenterArc((5.3294378, 5.999979507), CONG_8_R, 199.32113209, 70.529116987)
            Line((-0.332636114, 4.014804703), (-0.898843505, 3.816287223))
            ThreePointArc((-0.898843505, 3.816287223), (-0.594734103, 2.015549572), (-0.599997951, 0.001568186))
            Line((-0.599997951, 0.001568186), (0.039235585, -0.598715766))
            ThreePointArc((0.039235585, -0.598715766), (0.406469528, -0.587176107), (5.312187751, -0.599997951))
            Line((5.312187751, -0.599997951), (5.313755938, 0))
        make_face()
    extrude(amount=4)
    with BuildSketch(Plane(origin=(-71, 9, -20.986111735), x_dir=(0.0851738990641256, 0, -0.996366100847582), z_dir=(0, 1, 0)), Plane(origin=(-11, 9, -20.986111735), x_dir=(0.08517389906412692, 0, -0.996366100847582), z_dir=(0, 1, 0))) as cong_8_piece_4:
        with BuildLine():
            CenterArc((5.539442635, 5.806654513), CONG_8_R, 184.886024817, 70.529116987)
            Line((-0.43875397, 5.295611118), (-1.03657363, 5.244506779))
            ThreePointArc((-1.03657363, 5.244506779), (-0.618733054, 0.356598746), (-0.599911, -0.010334031))
            Line((-0.599911, -0.010334031), (0.051104339, -0.597819661))
            ThreePointArc((0.051104339, -0.597819661), (2.057773974, -0.426280427), (3.877472817, -0.580665451))
            Line((3.877472817, -0.580665451), (4.028560983, 0))
        make_face()
    extrude(amount=4)

    # Esquisse19 → Enlèv. mat.-Extru.10 (cut)
    with BuildSketch(Plane(origin=(0, 13, 0), x_dir=(1, 0, 0), z_dir=(0, 1, 0))):
        with Locations((-14.701449298, 0)):
            Rectangle(ESQUISSE19_W, ESQUISSE19_H)
    extrude(amount=-ENL_V_MAT_EXTRU_10_DEPTH, mode=Mode.SUBTRACT)

    # Congé9
    cong_9_edges = [part.edges().sort_by_distance(p)[0] for p in [
        (-12.923244757, 11.5, -6.961928281),
        (-12.923244757, 11.5, 6.961928281),
        (-18.490920253, 11.5, 6.961928281),
        (-18.490920253, 11.5, -6.961928281),
    ]]
    fillet(cong_9_edges, radius=CONG_9_R)


solid = part.part
